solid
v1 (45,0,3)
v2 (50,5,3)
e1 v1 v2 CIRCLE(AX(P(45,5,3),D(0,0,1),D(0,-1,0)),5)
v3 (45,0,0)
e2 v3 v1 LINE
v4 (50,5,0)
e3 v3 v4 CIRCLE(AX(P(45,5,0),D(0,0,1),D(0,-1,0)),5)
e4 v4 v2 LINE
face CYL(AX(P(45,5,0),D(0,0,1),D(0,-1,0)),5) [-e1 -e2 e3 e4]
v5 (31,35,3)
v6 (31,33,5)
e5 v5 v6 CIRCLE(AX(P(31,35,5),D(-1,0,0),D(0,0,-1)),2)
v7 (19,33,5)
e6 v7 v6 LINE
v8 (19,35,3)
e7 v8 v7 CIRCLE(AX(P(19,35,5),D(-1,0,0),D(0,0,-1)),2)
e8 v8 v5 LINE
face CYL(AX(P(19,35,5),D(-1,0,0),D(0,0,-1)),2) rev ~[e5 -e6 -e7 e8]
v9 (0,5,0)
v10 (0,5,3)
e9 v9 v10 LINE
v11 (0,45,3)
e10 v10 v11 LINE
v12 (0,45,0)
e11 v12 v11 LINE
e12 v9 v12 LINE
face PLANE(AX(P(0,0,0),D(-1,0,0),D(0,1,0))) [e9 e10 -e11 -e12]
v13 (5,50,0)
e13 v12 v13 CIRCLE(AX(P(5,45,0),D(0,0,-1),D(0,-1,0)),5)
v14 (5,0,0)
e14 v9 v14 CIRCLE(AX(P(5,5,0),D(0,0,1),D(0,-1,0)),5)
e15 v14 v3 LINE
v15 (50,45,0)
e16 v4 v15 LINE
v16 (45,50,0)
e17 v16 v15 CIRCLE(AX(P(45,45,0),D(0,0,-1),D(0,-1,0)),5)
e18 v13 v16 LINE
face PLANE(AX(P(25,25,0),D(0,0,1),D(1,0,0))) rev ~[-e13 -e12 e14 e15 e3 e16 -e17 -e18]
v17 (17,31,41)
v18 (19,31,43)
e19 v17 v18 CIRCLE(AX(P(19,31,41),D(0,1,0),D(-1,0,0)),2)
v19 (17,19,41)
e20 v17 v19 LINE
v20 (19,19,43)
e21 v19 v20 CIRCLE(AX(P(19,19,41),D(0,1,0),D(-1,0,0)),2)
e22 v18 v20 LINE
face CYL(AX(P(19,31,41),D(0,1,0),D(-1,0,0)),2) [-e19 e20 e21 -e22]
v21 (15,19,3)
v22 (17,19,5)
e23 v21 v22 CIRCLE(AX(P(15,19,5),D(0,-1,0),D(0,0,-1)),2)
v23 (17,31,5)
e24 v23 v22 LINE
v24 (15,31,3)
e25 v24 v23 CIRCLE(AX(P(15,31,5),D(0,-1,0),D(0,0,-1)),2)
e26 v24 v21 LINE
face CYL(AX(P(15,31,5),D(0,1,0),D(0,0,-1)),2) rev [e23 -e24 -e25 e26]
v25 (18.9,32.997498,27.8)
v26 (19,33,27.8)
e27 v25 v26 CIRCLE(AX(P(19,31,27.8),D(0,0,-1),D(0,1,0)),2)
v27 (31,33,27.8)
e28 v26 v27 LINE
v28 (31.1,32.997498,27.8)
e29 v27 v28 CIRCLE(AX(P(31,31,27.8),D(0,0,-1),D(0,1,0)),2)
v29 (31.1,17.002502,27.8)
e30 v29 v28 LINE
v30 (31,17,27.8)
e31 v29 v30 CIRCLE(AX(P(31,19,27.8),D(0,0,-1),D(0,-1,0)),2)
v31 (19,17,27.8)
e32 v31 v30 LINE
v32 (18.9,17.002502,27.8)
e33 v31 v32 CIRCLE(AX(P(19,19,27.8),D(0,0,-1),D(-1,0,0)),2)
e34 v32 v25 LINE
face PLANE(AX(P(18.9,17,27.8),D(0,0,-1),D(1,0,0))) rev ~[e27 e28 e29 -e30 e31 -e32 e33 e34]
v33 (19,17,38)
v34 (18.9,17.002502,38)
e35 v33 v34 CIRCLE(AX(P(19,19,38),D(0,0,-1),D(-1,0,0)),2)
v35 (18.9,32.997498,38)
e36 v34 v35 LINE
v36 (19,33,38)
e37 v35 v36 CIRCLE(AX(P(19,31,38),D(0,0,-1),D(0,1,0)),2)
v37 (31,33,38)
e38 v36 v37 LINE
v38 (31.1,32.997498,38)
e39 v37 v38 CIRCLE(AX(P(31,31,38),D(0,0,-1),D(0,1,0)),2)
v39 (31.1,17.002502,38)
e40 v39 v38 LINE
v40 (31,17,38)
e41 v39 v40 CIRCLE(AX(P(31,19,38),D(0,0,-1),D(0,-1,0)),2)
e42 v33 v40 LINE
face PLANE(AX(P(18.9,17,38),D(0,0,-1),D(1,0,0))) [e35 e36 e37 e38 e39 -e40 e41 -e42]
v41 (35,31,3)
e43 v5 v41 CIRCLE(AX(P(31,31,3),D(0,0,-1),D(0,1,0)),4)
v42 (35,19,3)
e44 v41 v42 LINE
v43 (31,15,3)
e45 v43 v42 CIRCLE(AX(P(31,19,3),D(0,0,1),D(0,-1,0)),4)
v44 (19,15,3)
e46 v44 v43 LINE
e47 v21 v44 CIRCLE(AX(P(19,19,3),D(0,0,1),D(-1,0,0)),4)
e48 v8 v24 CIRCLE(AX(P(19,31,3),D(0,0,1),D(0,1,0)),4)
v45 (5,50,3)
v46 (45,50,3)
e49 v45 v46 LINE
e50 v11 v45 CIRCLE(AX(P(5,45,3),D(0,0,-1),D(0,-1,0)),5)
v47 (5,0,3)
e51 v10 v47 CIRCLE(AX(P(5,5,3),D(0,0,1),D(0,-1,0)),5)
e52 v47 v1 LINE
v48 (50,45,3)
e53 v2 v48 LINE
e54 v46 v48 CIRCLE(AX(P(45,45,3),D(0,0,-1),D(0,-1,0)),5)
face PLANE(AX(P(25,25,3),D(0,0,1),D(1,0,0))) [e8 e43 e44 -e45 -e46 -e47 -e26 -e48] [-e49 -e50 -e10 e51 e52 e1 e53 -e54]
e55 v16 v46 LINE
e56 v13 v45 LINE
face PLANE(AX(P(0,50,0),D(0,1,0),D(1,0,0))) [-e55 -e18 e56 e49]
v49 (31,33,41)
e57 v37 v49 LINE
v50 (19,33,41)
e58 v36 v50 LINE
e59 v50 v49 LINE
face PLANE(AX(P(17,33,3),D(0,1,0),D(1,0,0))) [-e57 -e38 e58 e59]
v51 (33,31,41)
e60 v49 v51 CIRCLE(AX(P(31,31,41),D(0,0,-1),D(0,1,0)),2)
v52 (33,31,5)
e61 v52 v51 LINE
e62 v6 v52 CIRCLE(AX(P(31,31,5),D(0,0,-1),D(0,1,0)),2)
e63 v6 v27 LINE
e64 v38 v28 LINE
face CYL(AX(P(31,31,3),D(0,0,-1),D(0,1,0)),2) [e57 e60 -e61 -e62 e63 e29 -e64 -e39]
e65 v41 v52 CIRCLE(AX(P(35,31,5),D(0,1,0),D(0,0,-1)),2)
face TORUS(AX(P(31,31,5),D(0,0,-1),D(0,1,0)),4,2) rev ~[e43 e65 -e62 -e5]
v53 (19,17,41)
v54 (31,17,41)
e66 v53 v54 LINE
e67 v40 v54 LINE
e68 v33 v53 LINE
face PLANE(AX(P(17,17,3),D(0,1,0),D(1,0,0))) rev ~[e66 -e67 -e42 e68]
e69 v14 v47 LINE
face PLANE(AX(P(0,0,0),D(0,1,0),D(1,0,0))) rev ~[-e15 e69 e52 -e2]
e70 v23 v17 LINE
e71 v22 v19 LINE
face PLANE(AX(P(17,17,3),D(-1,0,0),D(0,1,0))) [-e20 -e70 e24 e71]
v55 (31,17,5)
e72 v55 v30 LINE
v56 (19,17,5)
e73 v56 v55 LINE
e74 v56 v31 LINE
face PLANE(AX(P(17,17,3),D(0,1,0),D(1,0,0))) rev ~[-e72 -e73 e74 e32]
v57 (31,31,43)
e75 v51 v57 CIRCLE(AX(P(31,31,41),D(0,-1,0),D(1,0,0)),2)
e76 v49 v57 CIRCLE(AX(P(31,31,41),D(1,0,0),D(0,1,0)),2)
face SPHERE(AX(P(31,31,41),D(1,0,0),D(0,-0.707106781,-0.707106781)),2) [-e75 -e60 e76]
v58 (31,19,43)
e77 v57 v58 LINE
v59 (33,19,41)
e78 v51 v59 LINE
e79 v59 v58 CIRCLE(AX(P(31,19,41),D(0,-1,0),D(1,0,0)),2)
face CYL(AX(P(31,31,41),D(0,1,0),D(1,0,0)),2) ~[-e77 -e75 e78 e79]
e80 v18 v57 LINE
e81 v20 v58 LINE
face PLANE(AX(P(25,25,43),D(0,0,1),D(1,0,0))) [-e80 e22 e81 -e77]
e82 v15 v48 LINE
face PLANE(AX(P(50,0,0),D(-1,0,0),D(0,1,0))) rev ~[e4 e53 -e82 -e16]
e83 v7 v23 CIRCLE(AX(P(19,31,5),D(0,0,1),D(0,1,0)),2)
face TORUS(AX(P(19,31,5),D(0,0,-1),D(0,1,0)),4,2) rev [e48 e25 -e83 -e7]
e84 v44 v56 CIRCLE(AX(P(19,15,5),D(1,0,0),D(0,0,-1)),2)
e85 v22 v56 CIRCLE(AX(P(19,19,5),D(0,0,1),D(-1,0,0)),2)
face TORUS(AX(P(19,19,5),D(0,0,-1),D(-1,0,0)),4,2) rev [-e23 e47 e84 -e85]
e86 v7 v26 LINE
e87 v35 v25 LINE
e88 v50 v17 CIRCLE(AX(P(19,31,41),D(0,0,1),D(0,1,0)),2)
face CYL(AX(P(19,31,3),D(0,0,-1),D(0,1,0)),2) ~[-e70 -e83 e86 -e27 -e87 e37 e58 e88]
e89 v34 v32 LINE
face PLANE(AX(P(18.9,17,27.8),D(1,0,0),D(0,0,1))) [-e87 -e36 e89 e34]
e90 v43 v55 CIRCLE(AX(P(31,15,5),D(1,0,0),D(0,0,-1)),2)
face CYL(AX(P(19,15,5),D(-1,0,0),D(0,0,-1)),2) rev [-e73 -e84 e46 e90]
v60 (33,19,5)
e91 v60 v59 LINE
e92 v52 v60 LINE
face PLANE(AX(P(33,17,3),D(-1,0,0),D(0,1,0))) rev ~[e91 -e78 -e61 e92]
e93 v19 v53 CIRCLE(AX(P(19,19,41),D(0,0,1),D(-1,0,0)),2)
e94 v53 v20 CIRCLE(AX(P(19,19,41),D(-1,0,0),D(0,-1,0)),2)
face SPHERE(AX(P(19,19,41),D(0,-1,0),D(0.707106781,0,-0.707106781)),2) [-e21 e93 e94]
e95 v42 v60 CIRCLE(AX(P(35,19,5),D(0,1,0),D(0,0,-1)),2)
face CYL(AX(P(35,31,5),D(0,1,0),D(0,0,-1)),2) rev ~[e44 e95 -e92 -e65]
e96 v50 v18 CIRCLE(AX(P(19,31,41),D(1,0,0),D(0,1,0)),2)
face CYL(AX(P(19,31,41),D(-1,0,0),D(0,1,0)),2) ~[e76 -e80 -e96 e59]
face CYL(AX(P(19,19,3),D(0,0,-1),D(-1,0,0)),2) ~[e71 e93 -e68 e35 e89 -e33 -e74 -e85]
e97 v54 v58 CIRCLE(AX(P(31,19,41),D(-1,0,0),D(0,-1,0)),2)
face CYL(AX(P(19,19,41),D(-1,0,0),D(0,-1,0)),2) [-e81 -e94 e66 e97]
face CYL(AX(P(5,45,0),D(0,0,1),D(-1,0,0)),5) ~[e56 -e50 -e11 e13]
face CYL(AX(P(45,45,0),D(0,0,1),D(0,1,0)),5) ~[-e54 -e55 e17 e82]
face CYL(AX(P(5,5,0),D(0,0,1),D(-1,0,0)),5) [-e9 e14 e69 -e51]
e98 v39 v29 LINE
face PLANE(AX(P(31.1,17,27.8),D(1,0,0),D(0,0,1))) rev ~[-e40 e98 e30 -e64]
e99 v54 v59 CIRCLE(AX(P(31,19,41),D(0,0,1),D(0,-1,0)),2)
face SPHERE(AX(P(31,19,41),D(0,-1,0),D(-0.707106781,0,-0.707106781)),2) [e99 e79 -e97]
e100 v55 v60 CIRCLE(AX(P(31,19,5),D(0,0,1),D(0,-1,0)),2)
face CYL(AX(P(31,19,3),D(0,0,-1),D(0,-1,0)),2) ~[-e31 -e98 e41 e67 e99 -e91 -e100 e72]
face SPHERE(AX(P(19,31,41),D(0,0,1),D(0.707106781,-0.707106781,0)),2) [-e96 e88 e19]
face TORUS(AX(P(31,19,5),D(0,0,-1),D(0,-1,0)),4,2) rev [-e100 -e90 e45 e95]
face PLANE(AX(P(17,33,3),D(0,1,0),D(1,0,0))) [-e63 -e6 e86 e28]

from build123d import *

# Parameters (mm, degrees)
F0_W         = 50
F0_H         = 50
F1_DEPTH     = 3
F2_W         = 16
F2_H         = 16
F3_DEPTH     = 40
F4_W         = 12.2
F4_H         = 10.2
F5_DEPTH     = 16
F6_T1_DEPTH  = 12
F6_T3_DEPTH  = 12
F6_T5_DEPTH  = 38
F6_S9_W      = 2
F6_S9_H      = 2
F6_T10_DEPTH = 2
F6_S15_W     = 2
F6_S15_H     = 2
F6_T16_DEPTH = 2
F6_S21_W     = 2
F6_S21_H     = 2
F6_T22_DEPTH = 2
F6_S27_W     = 2
F6_S27_H     = 2
F6_T28_DEPTH = 2
F6_T31_DEPTH = 12
F6_T33_DEPTH = 12
F6_T36_ANGLE = 90
F6_T38_ANGLE = 90
F6_T40_ANGLE = 90
F6_T42_ANGLE = 90
F7_R         = 5


# Not quite as in the source:
# - a fillet or chamfer that OpenCascade refuses, or shapes differently, is made with other operations: its cross-section is extruded or revolved along the edge and cut away or added


with BuildPart() as f1:
    # F0 (on Top) → F1 (new body)
    with BuildSketch(Plane.XY):
        with Locations((25, 25)):
            Rectangle(F0_W, F0_H)
    extrude(amount=F1_DEPTH)

    # F2 (on face) → F3 (join)
    with BuildSketch(Plane.XY.offset(3)):
        with Locations((25, 25)):
            Rectangle(F2_W, F2_H)
    extrude(amount=F3_DEPTH)

    # F4 (on face) → F5 (cut)
    with BuildSketch(Plane.XZ.offset(-17)):
        with Locations((25, 32.9)):
            Rectangle(F4_W, F4_H)
    extrude(amount=-F5_DEPTH, mode=Mode.SUBTRACT)

    # F6: fillet of radius 2 on 12 edges, made by hand

    # F6_s2 → F6_t1 (cut)
    with BuildSketch(Plane.YZ.offset(19)):
        with BuildLine():
            ThreePointArc((17, 41), (17.5857864376, 42.4142135624), (19, 43))
            Line((19, 43), (17, 43))
            Line((17, 43), (17, 41))
        make_face()
        with BuildLine():
            ThreePointArc((33, 41), (32.4142135624, 42.4142135624), (31, 43))
            Line((31, 43), (33, 43))
            Line((33, 43), (33, 41))
        make_face()
    extrude(amount=F6_T1_DEPTH, mode=Mode.SUBTRACT)

    # F6_s4 → F6_t3 (cut)
    with BuildSketch(Plane.XZ.offset(-31)):
        with BuildLine():
            ThreePointArc((33, 41), (32.4142135624, 42.4142135624), (31, 43))
            Line((31, 43), (33, 43))
            Line((33, 43), (33, 41))
        make_face()
        with BuildLine():
            ThreePointArc((17, 41), (17.5857864376, 42.4142135624), (19, 43))
            Line((19, 43), (17, 43))
            Line((17, 43), (17, 41))
        make_face()
    extrude(amount=F6_T3_DEPTH, mode=Mode.SUBTRACT)

    # F6_s6 → F6_t5 (cut)
    with BuildSketch(Plane.XY.offset(3)):
        with BuildLine():
            ThreePointArc((31, 17), (32.4142135624, 17.5857864376), (33, 19))
            Line((33, 19), (33, 17))
            Line((33, 17), (31, 17))
        make_face()
        with BuildLine():
            ThreePointArc((31, 33), (32.4142135624, 32.4142135624), (33, 31))
            Line((33, 31), (33, 33))
            Line((33, 33), (31, 33))
        make_face()
        with BuildLine():
            ThreePointArc((17, 19), (17.5857864376, 17.5857864376), (19, 17))
            Line((19, 17), (17, 17))
            Line((17, 17), (17, 19))
        make_face()
        with BuildLine():
            ThreePointArc((19, 33), (17.5857864376, 32.4142135624), (17, 31))
            Line((17, 31), (17, 33))
            Line((17, 33), (19, 33))
        make_face()
    extrude(amount=F6_T5_DEPTH, mode=Mode.SUBTRACT)


with BuildPart() as f6_tool8:
    # F6_s9 → F6_t10 (new body)
    with BuildSketch(Plane.XZ.offset(-19)):
        with Locations((18, 42)):
            Rectangle(F6_S9_W, F6_S9_H)
    extrude(amount=F6_T10_DEPTH)

    # F6_s11 → F6_t12 (revolve, cut)
    with BuildSketch(Plane(origin=(19, 19, 41), x_dir=(0.7071067812, 0, -0.7071067812), z_dir=(-0.7071067812, 0, -0.7071067812))):
        with BuildLine():
            ThreePointArc((0, -2), (2, 0), (0, 2))
            Line((0, 2), (0, -2))
        make_face()
    revolve(axis=Axis((19, 19, 41), (0, -1, 0)), mode=Mode.SUBTRACT)


with BuildPart() as f1_1:
    add(f1.part)

    # F6_t7: cut F6_tool8
    add(f6_tool8.part, mode=Mode.SUBTRACT)


with BuildPart() as f6_tool14:
    # F6_s15 → F6_t16 (new body)
    with BuildSketch(Plane.XZ.offset(-19)):
        with Locations((32, 42)):
            Rectangle(F6_S15_W, F6_S15_H)
    extrude(amount=F6_T16_DEPTH)

    # F6_s17 → F6_t18 (revolve, cut)
    with BuildSketch(Plane(origin=(31, 19, 41), x_dir=(-0.7071067812, 0, -0.7071067812), z_dir=(-0.7071067812, 0, 0.7071067812))):
        with BuildLine():
            ThreePointArc((0, -2), (2, 0), (0, 2))
            Line((0, 2), (0, -2))
        make_face()
    revolve(axis=Axis((31, 19, 41), (0, -1, 0)), mode=Mode.SUBTRACT)


with BuildPart() as f1_2:
    add(f1_1.part)

    # F6_t13: cut F6_tool14
    add(f6_tool14.part, mode=Mode.SUBTRACT)


with BuildPart() as f6_tool20:
    # F6_s21 → F6_t22 (new body)
    with BuildSketch(Plane.YZ.offset(31)):
        with Locations((32, 42)):
            Rectangle(F6_S21_W, F6_S21_H)
    extrude(amount=F6_T22_DEPTH)

    # F6_s23 → F6_t24 (revolve, cut)
    with BuildSketch(Plane(origin=(31, 31, 41), x_dir=(0, -0.7071067812, -0.7071067812), z_dir=(0, -0.7071067812, 0.7071067812))):
        with BuildLine():
            ThreePointArc((0, -2), (2, 0), (0, 2))
            Line((0, 2), (0, -2))
        make_face()
    revolve(axis=Axis((31, 31, 41), (1, 0, 0)), mode=Mode.SUBTRACT)


with BuildPart() as f1_3:
    add(f1_2.part)

    # F6_t19: cut F6_tool20
    add(f6_tool20.part, mode=Mode.SUBTRACT)


with BuildPart() as f6_tool26:
    # F6_s27 → F6_t28 (new body)
    with BuildSketch(Plane.XY.offset(41)):
        with Locations((18, 32)):
            Rectangle(F6_S27_W, F6_S27_H)
    extrude(amount=F6_T28_DEPTH)

    # F6_s29 → F6_t30 (revolve, cut)
    with BuildSketch(Plane(origin=(19, 31, 41), x_dir=(0.7071067812, -0.7071067812, 0), z_dir=(-0.7071067812, -0.7071067812, 0))):
        with BuildLine():
            ThreePointArc((0, -2), (2, 0), (0, 2))
            Line((0, 2), (0, -2))
        make_face()
    revolve(axis=Axis((19, 31, 41), (0, 0, 1)), mode=Mode.SUBTRACT)


with BuildPart() as f1_4:
    add(f1_3.part)

    # F6_t25: cut F6_tool26
    add(f6_tool26.part, mode=Mode.SUBTRACT)

    # F6_s32 → F6_t31 (join)
    with BuildSketch(Plane.YZ.offset(19)):
        with BuildLine():
            ThreePointArc((15, 3), (16.4142135624, 3.5857864376), (17, 5))
            Line((17, 5), (17, 3))
            Line((17, 3), (15, 3))
        make_face()
        with BuildLine():
            ThreePointArc((35, 3), (33.5857864376, 3.5857864376), (33, 5))
            Line((33, 5), (33, 3))
            Line((33, 3), (35, 3))
        make_face()
    extrude(amount=F6_T31_DEPTH)

    # F6_s34 → F6_t33 (join)
    with BuildSketch(Plane.XZ.offset(-31)):
        with BuildLine():
            ThreePointArc((35, 3), (33.5857864376, 3.5857864376), (33, 5))
            Line((33, 5), (33, 3))
            Line((33, 3), (35, 3))
        make_face()
        with BuildLine():
            ThreePointArc((15, 3), (16.4142135624, 3.5857864376), (17, 5))
            Line((17, 5), (17, 3))
            Line((17, 3), (15, 3))
        make_face()
    extrude(amount=F6_T33_DEPTH)

    # F6_s35 → F6_t36 (revolve)
    with BuildSketch(Plane.YZ.offset(31)):
        with BuildLine():
            ThreePointArc((35, 3), (33.5857864376, 3.5857864376), (33, 5))
            Line((33, 5), (33, 3))
            Line((33, 3), (35, 3))
        make_face()
    revolve(axis=Axis((31, 31, 3), (0, 0, -1)), revolution_arc=F6_T36_ANGLE)

    # F6_s37 → F6_t38 (revolve)
    with BuildSketch(Plane.YZ.offset(19)):
        with BuildLine():
            ThreePointArc((35, 3), (33.5857864376, 3.5857864376), (33, 5))
            Line((33, 5), (33, 3))
            Line((33, 3), (35, 3))
        make_face()
    revolve(axis=Axis((19, 31, 3), (0, 0, 1)), revolution_arc=F6_T38_ANGLE)

    # F6_s39 → F6_t40 (revolve)
    with BuildSketch(Plane.XZ.offset(-19)):
        with BuildLine():
            ThreePointArc((15, 3), (16.4142135624, 3.5857864376), (17, 5))
            Line((17, 5), (17, 3))
            Line((17, 3), (15, 3))
        make_face()
    revolve(axis=Axis((19, 19, 3), (0, 0, 1)), revolution_arc=F6_T40_ANGLE)

    # F6_s41 → F6_t42 (revolve)
    with BuildSketch(Plane.YZ.offset(31)):
        with BuildLine():
            ThreePointArc((15, 3), (16.4142135624, 3.5857864376), (17, 5))
            Line((17, 5), (17, 3))
            Line((17, 3), (15, 3))
        make_face()
    revolve(axis=Axis((31, 19, 3), (0, 0, 1)), revolution_arc=F6_T42_ANGLE)

    # F7
    f7_edges = [f1_4.edges().sort_by_distance(p)[0] for p in [
        (0, 0, 1.5),
        (50, 0, 1.5),
        (0, 50, 1.5),
        (50, 50, 1.5),
    ]]
    fillet(f7_edges, radius=F7_R)


solid = f1_4.part
